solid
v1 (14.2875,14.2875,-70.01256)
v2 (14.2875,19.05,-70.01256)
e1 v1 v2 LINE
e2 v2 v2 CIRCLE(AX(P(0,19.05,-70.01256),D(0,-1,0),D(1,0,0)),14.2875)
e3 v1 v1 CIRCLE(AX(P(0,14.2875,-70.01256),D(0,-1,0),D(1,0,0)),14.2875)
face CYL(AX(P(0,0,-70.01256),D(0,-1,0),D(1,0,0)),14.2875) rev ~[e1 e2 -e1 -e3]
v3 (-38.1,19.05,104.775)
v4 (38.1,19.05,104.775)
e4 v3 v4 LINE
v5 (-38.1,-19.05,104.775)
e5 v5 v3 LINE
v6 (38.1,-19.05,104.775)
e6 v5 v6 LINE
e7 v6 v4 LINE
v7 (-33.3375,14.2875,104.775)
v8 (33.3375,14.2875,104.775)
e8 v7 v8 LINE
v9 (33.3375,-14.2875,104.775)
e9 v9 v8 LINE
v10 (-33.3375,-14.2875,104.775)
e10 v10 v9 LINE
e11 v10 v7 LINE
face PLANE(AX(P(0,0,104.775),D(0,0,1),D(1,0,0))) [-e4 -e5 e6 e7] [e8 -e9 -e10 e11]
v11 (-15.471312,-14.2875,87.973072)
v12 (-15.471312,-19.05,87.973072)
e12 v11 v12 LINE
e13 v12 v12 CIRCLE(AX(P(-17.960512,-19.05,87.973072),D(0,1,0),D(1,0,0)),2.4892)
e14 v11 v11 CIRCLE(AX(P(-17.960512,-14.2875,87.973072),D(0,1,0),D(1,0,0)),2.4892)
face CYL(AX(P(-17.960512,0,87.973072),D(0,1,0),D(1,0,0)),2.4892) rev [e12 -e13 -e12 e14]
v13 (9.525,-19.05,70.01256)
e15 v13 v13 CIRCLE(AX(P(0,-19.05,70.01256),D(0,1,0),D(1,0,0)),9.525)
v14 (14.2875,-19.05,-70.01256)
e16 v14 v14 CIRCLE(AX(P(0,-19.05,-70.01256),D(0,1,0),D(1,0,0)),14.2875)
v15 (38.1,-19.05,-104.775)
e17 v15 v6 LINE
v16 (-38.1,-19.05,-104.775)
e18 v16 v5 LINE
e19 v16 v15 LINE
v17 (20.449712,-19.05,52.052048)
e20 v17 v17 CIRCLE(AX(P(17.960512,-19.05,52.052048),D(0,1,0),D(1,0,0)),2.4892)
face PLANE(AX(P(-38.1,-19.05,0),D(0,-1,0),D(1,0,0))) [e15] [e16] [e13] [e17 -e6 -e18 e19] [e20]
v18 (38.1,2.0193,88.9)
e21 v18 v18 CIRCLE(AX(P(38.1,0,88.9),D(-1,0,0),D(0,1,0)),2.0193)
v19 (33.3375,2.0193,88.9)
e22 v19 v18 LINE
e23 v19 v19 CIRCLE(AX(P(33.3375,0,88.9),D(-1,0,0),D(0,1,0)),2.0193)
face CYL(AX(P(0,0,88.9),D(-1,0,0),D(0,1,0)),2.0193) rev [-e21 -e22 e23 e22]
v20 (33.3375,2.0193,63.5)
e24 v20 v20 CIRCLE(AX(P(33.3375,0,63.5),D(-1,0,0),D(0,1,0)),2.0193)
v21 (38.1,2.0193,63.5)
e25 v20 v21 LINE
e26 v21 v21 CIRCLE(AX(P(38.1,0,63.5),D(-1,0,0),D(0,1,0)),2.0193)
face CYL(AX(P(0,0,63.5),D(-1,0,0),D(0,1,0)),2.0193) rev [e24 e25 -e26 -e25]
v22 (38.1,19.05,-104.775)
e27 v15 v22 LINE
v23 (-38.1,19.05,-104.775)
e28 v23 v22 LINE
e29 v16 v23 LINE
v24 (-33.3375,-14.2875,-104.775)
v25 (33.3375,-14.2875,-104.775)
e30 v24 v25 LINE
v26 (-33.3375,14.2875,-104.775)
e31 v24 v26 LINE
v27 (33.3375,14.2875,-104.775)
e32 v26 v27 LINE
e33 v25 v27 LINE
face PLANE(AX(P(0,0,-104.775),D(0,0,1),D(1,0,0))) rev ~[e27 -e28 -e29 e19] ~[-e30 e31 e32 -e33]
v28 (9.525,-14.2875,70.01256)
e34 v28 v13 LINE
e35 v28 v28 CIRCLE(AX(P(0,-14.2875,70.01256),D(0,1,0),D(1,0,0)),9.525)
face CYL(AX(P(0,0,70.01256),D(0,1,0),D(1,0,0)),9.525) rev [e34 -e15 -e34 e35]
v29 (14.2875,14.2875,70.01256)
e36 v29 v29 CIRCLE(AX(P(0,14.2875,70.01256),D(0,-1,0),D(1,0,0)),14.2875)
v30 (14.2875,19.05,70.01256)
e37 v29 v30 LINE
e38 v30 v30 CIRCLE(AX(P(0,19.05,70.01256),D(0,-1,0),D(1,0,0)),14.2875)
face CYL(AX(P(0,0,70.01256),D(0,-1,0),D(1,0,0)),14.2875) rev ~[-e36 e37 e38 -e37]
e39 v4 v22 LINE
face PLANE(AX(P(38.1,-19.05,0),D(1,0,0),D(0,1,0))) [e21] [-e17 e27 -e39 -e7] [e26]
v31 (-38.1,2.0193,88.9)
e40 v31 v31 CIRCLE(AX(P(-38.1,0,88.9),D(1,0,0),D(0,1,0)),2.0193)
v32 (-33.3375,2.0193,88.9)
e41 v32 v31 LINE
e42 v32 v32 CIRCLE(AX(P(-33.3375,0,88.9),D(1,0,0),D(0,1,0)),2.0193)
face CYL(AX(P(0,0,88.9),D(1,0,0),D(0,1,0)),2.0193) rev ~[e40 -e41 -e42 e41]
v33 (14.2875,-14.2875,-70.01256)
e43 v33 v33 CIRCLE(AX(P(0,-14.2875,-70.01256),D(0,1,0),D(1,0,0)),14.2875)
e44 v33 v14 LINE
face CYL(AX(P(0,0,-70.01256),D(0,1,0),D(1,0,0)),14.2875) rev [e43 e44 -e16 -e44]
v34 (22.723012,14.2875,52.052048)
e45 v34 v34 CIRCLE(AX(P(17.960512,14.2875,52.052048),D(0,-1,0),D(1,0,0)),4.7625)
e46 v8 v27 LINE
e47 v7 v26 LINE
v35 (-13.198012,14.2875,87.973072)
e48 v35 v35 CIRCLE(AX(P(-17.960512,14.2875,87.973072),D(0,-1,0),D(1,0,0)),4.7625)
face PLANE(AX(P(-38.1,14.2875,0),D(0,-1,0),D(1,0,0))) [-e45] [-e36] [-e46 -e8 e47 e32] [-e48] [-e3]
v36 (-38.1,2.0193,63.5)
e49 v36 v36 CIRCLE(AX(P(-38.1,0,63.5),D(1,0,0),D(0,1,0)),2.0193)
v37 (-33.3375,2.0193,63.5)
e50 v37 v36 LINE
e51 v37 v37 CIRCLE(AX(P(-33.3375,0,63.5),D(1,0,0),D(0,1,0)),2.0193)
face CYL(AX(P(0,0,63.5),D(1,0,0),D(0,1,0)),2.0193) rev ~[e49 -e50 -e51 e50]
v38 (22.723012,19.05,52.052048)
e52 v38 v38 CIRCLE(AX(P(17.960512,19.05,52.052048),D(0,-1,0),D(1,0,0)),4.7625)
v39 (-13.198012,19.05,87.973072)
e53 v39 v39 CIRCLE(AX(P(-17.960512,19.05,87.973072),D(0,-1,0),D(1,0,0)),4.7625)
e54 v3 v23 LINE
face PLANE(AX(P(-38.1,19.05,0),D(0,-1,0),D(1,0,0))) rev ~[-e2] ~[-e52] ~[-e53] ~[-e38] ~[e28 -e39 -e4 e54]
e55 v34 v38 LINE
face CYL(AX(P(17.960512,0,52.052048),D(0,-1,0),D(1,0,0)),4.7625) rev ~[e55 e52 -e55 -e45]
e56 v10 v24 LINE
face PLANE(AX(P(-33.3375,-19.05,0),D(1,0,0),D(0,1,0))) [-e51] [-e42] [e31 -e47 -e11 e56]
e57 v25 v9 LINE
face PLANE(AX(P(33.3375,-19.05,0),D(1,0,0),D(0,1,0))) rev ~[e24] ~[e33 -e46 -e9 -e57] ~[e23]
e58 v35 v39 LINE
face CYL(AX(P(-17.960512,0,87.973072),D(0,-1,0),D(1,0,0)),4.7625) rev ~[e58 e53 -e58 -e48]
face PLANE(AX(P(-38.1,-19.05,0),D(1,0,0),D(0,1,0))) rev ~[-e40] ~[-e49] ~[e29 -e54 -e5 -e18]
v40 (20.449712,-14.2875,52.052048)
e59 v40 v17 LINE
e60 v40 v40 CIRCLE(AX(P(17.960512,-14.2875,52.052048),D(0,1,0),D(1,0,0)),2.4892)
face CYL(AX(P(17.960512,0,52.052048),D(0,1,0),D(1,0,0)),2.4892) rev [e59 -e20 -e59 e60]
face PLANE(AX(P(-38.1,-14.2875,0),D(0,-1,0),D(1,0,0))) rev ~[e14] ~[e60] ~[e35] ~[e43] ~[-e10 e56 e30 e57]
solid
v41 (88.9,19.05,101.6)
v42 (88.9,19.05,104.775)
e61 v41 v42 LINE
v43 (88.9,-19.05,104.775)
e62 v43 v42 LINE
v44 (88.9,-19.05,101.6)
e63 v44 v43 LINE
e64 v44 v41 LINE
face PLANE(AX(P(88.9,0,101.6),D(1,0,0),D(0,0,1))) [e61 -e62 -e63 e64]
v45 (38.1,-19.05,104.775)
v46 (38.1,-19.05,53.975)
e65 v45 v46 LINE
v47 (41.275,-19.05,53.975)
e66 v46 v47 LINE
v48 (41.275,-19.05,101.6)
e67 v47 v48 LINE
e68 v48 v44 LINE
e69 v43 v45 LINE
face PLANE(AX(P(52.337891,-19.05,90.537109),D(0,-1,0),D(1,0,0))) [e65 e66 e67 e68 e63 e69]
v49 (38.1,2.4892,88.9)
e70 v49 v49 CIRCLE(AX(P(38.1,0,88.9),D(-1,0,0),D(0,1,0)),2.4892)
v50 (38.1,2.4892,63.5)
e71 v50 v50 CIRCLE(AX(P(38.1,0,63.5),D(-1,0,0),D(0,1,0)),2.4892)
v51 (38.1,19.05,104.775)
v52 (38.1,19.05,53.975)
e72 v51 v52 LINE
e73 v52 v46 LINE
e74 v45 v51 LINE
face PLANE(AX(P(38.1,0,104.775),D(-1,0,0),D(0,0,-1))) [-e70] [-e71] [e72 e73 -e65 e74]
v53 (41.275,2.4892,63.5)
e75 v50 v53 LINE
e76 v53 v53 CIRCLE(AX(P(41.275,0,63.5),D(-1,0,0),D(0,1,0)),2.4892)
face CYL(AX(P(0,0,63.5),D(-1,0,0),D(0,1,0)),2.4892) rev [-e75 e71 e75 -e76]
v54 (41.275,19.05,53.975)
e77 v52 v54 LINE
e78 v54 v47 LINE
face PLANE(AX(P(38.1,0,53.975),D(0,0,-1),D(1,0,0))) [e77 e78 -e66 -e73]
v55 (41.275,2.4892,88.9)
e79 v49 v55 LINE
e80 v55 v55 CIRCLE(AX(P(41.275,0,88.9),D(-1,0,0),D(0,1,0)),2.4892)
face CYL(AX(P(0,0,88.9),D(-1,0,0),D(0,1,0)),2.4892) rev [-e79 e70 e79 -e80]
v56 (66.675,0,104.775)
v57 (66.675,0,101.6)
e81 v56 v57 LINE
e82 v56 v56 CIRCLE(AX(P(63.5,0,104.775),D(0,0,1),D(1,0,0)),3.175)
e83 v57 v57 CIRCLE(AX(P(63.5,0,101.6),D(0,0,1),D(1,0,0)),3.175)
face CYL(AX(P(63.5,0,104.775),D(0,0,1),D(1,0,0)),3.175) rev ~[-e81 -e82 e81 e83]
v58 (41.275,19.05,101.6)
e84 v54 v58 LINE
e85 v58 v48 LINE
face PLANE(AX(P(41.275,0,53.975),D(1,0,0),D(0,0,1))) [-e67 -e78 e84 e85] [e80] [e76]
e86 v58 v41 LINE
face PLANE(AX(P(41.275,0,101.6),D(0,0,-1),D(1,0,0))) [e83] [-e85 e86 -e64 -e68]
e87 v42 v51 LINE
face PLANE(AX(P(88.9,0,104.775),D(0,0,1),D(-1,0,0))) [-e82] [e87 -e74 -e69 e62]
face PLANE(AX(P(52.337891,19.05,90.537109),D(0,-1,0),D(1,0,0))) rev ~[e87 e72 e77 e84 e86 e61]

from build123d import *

# Parameters (mm, degrees)
F0_W          = 76.2
F0_H          = 38.1
F1_DEPTH      = 104.775
F2_T          = -4.7625
F3_R          = 9.525
F3_R_2        = 2.4892
F3_R_3        = 14.2875
F4_DEPTH      = 19.051
F3_R_4        = 4.7625
F5_DEPTH      = 25.4
F7_DEPTH      = 19.05
F8_R          = 2.0193
F9_DEPTH      = 38.101
F9_DEPTH_BACK = 88.901
F10_R         = 3.175
F11_DEPTH     = 209.551
F8_R_2        = 2.4892
F12_DEPTH     = 88.901


with BuildPart() as f1:
    # F0 (on Top) → F1 (new body, symmetric)
    with BuildSketch(Plane.XY):
        Rectangle(F0_W, F0_H)
    extrude(amount=F1_DEPTH, both=True)

    # F2
    f2_openings = [f1.faces().sort_by_distance(p)[0] for p in [
        (0, 0, 104.775),
        (0, 0, -104.775),
    ]]
    offset(amount=F2_T, openings=f2_openings)

    # F3 (on Front) → F4 (cut, through all)
    with BuildSketch(Plane.XZ):
        with Locations((0, 70.01256)):
            Circle(F3_R)
        with Locations((-17.9605122421, 87.9730722421)):
            Circle(F3_R_2)
        with Locations((17.9605122421, 52.0520477579)):
            Circle(F3_R_2)
        with Locations((0, -70.01256)):
            Circle(F3_R_3)
    extrude(amount=F4_DEPTH, mode=Mode.SUBTRACT)

    # F3 (on Front) → F5 (cut)
    with BuildSketch(Plane.XZ):
        with Locations((0, 70.01256)):
            Circle(F3_R_3)
        with Locations((0, 70.01256)):
            Circle(F3_R, mode=Mode.SUBTRACT)
        with Locations((0, -70.01256)):
            Circle(F3_R_3)
        with Locations((0, 70.01256)):
            Circle(F3_R)
        with Locations((-17.9605122421, 87.9730722421)):
            Circle(F3_R_4)
        with Locations((-17.9605122421, 87.9730722421)):
            Circle(F3_R_2, mode=Mode.SUBTRACT)
        with Locations((17.9605122421, 52.0520477579)):
            Circle(F3_R_4)
        with Locations((17.9605122421, 52.0520477579)):
            Circle(F3_R_2, mode=Mode.SUBTRACT)
        with Locations((-17.9605122421, 87.9730722421)):
            Circle(F3_R_2)
        with Locations((17.9605122421, 52.0520477579)):
            Circle(F3_R_2)
    extrude(amount=-F5_DEPTH, mode=Mode.SUBTRACT)


with BuildPart() as f7:
    # F6 (on Front) → F7 (new body, symmetric)
    with BuildSketch(Plane.XZ):
        Polygon((38.1, 104.775), (38.1, 53.975), (41.275, 53.975), (41.275, 101.6), (88.9, 101.6), (88.9, 104.775), align=None)
    extrude(amount=F7_DEPTH, both=True)


with BuildPart() as f9_tool:
    # F8 (on Right) → F9 (new body, two sides)
    with BuildSketch(Plane.YZ) as f9_sk:
        with Locations((0, 88.9)):
            Circle(F8_R)
        with Locations((0, 63.5)):
            Circle(F8_R)
    extrude(amount=-F9_DEPTH)
    extrude(f9_sk.sketch, amount=F9_DEPTH_BACK)


with BuildPart() as f1_1:
    add(f1.part)

    # F9: cut by f9_tool
    add(f9_tool.part, mode=Mode.SUBTRACT)


with BuildPart() as f7_1:
    add(f7.part)

    # F9: cut by f9_tool
    add(f9_tool.part, mode=Mode.SUBTRACT)

    # F10 (on face) → F11 (cut, through all)
    with BuildSketch(Plane.XY.offset(104.775)):
        with Locations((63.5, 0)):
            Circle(F10_R)
    extrude(amount=-F11_DEPTH, mode=Mode.SUBTRACT)

    # F8 (on Right) → F12 (cut, through all)
    with BuildSketch(Plane.YZ):
        with Locations((0, 88.9)):
            Circle(F8_R_2)
        with Locations((0, 88.9)):
            Circle(F8_R, mode=Mode.SUBTRACT)
        with Locations((0, 63.5)):
            Circle(F8_R_2)
        with Locations((0, 63.5)):
            Circle(F8_R, mode=Mode.SUBTRACT)
        with Locations((0, 88.9)):
            Circle(F8_R)
        with Locations((0, 63.5)):
            Circle(F8_R)
    extrude(amount=F12_DEPTH, mode=Mode.SUBTRACT)


solid = Compound([f1_1.part, f7_1.part])
